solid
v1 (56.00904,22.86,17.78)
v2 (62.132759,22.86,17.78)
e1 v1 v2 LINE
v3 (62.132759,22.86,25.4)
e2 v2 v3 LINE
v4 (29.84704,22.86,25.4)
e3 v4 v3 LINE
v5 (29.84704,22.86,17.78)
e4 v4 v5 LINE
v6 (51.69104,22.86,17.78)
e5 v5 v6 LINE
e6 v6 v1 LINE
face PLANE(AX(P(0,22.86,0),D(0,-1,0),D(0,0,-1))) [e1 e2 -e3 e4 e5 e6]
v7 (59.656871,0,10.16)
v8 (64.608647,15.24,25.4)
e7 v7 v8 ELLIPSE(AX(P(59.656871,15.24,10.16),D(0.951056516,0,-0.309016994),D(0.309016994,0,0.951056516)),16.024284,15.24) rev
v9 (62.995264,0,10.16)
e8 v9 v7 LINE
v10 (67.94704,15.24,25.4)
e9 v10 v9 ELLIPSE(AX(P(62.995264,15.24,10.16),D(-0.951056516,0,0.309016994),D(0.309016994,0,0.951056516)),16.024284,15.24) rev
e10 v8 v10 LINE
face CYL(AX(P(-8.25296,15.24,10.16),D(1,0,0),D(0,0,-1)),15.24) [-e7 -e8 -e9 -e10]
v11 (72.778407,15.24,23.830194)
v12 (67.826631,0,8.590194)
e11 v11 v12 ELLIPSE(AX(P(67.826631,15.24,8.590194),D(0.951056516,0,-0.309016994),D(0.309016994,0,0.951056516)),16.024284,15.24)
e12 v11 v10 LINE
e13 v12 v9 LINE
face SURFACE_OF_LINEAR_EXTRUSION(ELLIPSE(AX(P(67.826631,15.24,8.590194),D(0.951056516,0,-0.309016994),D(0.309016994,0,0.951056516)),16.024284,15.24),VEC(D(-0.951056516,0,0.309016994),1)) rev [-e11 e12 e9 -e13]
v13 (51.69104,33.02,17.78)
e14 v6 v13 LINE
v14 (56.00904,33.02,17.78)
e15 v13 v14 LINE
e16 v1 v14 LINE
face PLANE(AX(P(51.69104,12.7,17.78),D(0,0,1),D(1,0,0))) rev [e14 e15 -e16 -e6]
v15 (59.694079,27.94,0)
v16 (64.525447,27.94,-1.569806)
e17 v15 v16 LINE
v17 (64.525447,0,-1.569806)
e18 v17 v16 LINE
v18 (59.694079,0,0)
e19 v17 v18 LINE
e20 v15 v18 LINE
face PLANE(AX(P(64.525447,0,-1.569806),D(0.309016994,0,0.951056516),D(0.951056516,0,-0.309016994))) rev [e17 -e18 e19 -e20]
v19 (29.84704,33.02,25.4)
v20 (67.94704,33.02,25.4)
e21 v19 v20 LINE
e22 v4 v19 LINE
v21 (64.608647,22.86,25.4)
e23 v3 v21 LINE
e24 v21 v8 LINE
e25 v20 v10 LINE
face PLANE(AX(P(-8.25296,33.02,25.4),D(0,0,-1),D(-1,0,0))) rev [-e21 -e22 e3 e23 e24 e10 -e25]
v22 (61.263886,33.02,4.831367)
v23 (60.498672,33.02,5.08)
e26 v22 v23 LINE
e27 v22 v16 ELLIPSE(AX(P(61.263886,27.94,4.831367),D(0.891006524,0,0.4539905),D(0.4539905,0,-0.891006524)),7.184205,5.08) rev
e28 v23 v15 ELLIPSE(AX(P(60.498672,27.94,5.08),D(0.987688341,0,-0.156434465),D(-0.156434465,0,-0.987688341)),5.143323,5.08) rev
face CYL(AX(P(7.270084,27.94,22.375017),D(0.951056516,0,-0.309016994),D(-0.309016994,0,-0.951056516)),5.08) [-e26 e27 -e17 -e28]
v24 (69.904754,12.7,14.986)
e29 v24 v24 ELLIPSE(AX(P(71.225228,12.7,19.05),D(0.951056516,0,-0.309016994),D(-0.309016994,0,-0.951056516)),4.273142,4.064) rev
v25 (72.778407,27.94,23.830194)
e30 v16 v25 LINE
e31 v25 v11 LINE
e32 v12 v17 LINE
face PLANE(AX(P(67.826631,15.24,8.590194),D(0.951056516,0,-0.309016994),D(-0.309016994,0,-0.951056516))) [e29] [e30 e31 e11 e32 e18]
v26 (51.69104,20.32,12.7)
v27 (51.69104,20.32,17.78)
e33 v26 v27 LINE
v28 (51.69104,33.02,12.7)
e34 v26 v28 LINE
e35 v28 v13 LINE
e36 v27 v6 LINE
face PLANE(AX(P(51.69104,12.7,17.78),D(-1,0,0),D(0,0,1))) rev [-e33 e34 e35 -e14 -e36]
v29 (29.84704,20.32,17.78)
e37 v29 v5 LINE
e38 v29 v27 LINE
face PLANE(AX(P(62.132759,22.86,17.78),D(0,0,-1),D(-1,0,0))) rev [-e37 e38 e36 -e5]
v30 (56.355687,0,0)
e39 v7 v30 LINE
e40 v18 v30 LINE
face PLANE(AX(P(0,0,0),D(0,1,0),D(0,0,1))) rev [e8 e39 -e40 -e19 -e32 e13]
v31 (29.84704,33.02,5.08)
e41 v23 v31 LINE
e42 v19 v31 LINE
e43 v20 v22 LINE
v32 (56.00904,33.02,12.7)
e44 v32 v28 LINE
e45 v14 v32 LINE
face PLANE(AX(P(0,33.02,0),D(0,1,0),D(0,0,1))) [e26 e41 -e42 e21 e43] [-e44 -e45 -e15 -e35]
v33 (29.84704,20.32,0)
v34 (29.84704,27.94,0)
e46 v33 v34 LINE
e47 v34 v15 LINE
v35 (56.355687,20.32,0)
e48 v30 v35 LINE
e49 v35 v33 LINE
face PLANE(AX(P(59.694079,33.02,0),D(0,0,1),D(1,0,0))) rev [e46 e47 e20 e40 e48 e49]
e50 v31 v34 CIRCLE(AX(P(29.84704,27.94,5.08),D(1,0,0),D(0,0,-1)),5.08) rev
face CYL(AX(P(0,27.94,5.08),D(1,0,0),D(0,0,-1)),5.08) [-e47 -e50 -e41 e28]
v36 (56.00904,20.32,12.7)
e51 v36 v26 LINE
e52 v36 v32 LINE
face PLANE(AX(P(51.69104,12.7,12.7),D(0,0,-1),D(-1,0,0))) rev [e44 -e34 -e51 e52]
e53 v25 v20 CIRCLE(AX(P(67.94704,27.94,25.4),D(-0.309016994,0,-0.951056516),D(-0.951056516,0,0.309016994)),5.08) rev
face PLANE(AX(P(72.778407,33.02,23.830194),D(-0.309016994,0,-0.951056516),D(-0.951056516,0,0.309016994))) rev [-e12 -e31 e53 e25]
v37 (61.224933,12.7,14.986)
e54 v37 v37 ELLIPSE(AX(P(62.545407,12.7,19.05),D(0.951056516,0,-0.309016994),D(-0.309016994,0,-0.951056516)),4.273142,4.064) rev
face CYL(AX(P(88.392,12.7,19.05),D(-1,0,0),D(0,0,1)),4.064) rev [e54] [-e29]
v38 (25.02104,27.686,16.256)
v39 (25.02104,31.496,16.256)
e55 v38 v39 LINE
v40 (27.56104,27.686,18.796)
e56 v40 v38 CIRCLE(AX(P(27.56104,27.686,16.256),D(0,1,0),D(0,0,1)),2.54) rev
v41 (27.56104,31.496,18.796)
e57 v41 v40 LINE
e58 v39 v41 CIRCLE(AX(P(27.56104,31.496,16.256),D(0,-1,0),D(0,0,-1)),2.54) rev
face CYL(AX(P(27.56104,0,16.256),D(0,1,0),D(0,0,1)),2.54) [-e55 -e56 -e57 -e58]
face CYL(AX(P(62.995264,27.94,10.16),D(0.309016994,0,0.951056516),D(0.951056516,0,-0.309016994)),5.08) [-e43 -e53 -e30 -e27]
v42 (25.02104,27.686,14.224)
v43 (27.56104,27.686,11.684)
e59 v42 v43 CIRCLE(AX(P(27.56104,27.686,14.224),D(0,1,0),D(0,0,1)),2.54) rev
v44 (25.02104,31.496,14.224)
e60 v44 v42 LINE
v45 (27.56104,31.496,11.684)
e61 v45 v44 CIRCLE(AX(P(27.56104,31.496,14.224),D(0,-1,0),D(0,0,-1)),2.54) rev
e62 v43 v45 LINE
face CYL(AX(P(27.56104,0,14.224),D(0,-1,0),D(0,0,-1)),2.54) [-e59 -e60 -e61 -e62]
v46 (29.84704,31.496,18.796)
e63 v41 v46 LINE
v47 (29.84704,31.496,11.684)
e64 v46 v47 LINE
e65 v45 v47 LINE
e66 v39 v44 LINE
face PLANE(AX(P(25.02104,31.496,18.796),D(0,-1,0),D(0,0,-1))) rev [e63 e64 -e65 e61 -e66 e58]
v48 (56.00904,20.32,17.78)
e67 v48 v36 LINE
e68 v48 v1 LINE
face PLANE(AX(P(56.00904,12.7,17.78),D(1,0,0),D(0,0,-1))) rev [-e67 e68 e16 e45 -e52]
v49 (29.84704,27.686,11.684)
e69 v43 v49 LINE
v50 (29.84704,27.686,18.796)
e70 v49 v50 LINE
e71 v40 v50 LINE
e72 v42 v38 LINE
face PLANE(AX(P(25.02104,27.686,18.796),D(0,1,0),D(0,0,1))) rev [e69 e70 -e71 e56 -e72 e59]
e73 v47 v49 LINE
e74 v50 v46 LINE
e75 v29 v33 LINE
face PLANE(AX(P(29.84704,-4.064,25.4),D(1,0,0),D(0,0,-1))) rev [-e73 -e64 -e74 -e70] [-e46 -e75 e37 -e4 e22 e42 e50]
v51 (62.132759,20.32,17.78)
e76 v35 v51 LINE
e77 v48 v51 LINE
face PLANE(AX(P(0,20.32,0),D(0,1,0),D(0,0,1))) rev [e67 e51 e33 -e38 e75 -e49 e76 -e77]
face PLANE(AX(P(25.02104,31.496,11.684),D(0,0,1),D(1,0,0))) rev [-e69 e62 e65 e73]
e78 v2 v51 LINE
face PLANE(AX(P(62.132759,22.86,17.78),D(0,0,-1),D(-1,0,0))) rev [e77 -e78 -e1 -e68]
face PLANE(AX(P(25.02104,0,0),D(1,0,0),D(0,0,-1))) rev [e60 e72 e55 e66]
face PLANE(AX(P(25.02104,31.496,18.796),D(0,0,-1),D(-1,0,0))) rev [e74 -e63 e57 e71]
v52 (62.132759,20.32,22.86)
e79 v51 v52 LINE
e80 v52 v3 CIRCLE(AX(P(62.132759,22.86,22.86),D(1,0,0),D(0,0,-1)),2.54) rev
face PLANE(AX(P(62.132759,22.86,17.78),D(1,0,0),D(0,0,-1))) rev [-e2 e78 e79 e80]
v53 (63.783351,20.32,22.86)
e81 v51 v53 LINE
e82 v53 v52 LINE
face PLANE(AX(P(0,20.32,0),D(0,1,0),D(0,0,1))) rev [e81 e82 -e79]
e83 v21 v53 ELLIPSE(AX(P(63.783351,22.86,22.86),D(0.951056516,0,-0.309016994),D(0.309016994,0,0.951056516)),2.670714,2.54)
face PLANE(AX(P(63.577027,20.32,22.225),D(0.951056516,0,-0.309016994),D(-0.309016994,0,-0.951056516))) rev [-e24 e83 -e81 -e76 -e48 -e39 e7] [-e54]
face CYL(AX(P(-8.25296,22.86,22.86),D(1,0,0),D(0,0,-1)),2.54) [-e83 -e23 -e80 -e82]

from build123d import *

# Parameters (mm, degrees)
BOSS_EXTRUDE1_DEPTH     = 33.02
CUT_EXTRUDE1_DEPTH      = 20.32
FILLET1_R               = 15.24
SKETCH4_W               = 4.318
SKETCH4_H               = 5.08
CUT_EXTRUDE3_DEPTH      = 20.32
FILLET2_R               = 2.54
BOSS_EXTRUDE2_DEPTH     = 5.08
BOSS_EXTRUDE3_DEPTH     = 5.08
CUT_EXTRUDE2_DEPTH      = 88.392
CUT_EXTRUDE2_DEPTH_BACK = 20.32
SKETCH3_R               = 4.064
FILLET3_R               = 5.08
SKETCH7_W               = 44.236060242
SKETCH7_H               = 34.660368577
CUT_EXTRUDE4_DEPTH      = 37.084
SKETCH8_W               = 7.112
SKETCH8_H               = 3.81
BOSS_EXTRUDE4_DEPTH     = 4.826
FILLET4_R               = 2.54
SKETCH9_W               = 32.557227401
SKETCH9_H               = 7.62
CUT_EXTRUDE5_DEPTH      = 2.54


with BuildPart() as part:
    # Sketch1 → Boss-Extrude1 (new body)
    with BuildSketch(Plane(origin=(0, 0, 0), x_dir=(1, 0, 0), z_dir=(0, 1, 0))):
        Polygon((0, 0), (-8.252960284, -25.4), (67.947039716, -25.4), (59.694079431, 0), align=None)
    extrude(amount=BOSS_EXTRUDE1_DEPTH)

    # Sketch2 → Cut-Extrude1 (cut)
    with BuildSketch(Plane.XZ):
        Polygon((-3.882947687, 22.225), (-6.015103815, 28.787101815), (66.521112465, 31.285963003), (63.577027118, 22.225), (57.387306905, 3.175), (55.156358593, -3.691152891), (4.897822181, -4.799430866), (2.306772526, 3.175), align=None)
    extrude(amount=-CUT_EXTRUDE1_DEPTH, mode=Mode.SUBTRACT)

    # Fillet1
    # the kernel refuses this fillet: 15.24 mm, written as the material it takes off along each edge
    with BuildSketch(Plane(origin=(26.508647154, 0, 25.4), x_dir=(0, 1, 0), z_dir=(1, 0, 0)), Plane(origin=(-46.352960284, 0, 25.4), x_dir=(0, 1, 0), z_dir=(1, 0, 0))) as fillet1_piece_1:
        with BuildLine():
            CenterArc((FILLET1_R, -FILLET1_R), FILLET1_R, 90, 90)
            Line((0, -FILLET1_R), (0, 0))
            Line((0, 0), (FILLET1_R, 0))
        make_face()
    extrude(amount=79.538392562, mode=Mode.SUBTRACT)

    # Sketch4 → Cut-Extrude3 (cut)
    with BuildSketch(Plane(origin=(0, 33.02, 0), x_dir=(1, 0, 0), z_dir=(0, 1, 0))):
        with Locations((53.850039716, -15.24)):
            Rectangle(SKETCH4_W, SKETCH4_H)
        with Locations((5.844039716, -15.24)):
            Rectangle(SKETCH4_W, SKETCH4_H)
    extrude(amount=-CUT_EXTRUDE3_DEPTH, mode=Mode.SUBTRACT)

    # Fillet2
    fillet2_edges = [part.edges().sort_by_distance(p)[0] for p in [
        (29.847039716, 20.32, 25.4),
    ]]
    fillet(fillet2_edges, radius=FILLET2_R)

    # Sketch5 → Boss-Extrude2 (add)
    with BuildSketch(Plane(origin=(0, 0, 0), x_dir=(-0.3090169943749446, 0, 0.9510565162951545), z_dir=(-0.9510565162951545, 0, -0.3090169943749446))):
        with BuildLine():
            Line((0, 0), (10.682856198, 0))
            add(Edge.make_bspline(
                [(10.682856198, 0), (26.707140496, 0), (26.707140496, 15.24)],
                knots=[1.570796327, 1.570796327, 1.570796327, 3.141592654, 3.141592654, 3.141592654], degree=2, weights=[1, 0.707106781, 1]))
            Line((26.707140496, 15.24), (26.707140496, 33.02))
            Line((26.707140496, 33.02), (0, 33.02))
            Line((0, 33.02), (0, 0))
        make_face()
    extrude(amount=BOSS_EXTRUDE2_DEPTH)

    # Sketch6 → Boss-Extrude3 (add)
    with BuildSketch(Plane(origin=(53.993802077, 0, -17.543649769), x_dir=(-0.30901699437494445, 0, -0.9510565162951545), z_dir=(0.9510565162951545, 0, -0.30901699437494445))):
        with BuildLine():
            Line((-45.153625504, 33.02), (-45.153625504, 15.24))
            add(Edge.make_bspline(
                [(-45.153625504, 15.24), (-45.153625504, 0), (-29.129341206, 0)],
                knots=[0, 0, 0, 1.570796327, 1.570796327, 1.570796327], degree=2, weights=[1, 0.707106781, 1]))
            Line((-29.129341206, 0), (-18.446485008, 0))
            Line((-18.446485008, 0), (-18.446485008, 33.02))
            Line((-18.446485008, 33.02), (-45.153625504, 33.02))
        make_face()
    extrude(amount=BOSS_EXTRUDE3_DEPTH)

    # Sketch3 → Cut-Extrude2 (cut, two sides: drawn at the far end of the back side and taken through both)
    with BuildSketch(Plane(origin=(0, 0, 0), x_dir=(0, 0, -1), z_dir=(1, 0, 0)).offset(-CUT_EXTRUDE2_DEPTH_BACK)):
        with Locations((-19.05, 12.7)):
            Circle(SKETCH3_R)
    extrude(amount=CUT_EXTRUDE2_DEPTH + CUT_EXTRUDE2_DEPTH_BACK, mode=Mode.SUBTRACT)

    # Fillet3
    fillet3_edges = [part.edges().sort_by_distance(p)[0] for p in [
        (-2.415683551, 33.02, -0.784903166),
        (62.109762983, 33.02, -0.784903166),
        (29.847039716, 33.02, 0),
        (-8.957847245, 33.02, 11.130193669),
        (68.651926676, 33.02, 11.130193669),
    ]]
    fillet(fillet3_edges, radius=FILLET3_R)

    # Sketch7 → Cut-Extrude4 (cut)
    with BuildSketch(Plane(origin=(0, 33.02, 0), x_dir=(1, 0, 0), z_dir=(0, 1, 0))):
        with Locations((7.729009595, -8.069815712)):
            Rectangle(SKETCH7_W, SKETCH7_H)
    extrude(amount=-CUT_EXTRUDE4_DEPTH, mode=Mode.SUBTRACT)

    # Sketch8 → Boss-Extrude4 (add)
    with BuildSketch(Plane.ZY.offset(-29.847039716)):
        with Locations((15.24, 29.591)):
            Rectangle(SKETCH8_W, SKETCH8_H)
    extrude(amount=BOSS_EXTRUDE4_DEPTH)

    # Fillet4
    fillet4_edges = [part.edges().sort_by_distance(p)[0] for p in [
        (25.021039716, 29.591, 18.796),
        (25.021039716, 29.591, 11.684),
    ]]
    fillet(fillet4_edges, radius=FILLET4_R)

    # Sketch9 → Cut-Extrude5 (cut)
    with BuildSketch(Plane.XZ.offset(-20.32)):
        with Locations((45.854145368, 21.59)):
            Rectangle(SKETCH9_W, SKETCH9_H)
    extrude(amount=-CUT_EXTRUDE5_DEPTH, mode=Mode.SUBTRACT)


solid = part.part
